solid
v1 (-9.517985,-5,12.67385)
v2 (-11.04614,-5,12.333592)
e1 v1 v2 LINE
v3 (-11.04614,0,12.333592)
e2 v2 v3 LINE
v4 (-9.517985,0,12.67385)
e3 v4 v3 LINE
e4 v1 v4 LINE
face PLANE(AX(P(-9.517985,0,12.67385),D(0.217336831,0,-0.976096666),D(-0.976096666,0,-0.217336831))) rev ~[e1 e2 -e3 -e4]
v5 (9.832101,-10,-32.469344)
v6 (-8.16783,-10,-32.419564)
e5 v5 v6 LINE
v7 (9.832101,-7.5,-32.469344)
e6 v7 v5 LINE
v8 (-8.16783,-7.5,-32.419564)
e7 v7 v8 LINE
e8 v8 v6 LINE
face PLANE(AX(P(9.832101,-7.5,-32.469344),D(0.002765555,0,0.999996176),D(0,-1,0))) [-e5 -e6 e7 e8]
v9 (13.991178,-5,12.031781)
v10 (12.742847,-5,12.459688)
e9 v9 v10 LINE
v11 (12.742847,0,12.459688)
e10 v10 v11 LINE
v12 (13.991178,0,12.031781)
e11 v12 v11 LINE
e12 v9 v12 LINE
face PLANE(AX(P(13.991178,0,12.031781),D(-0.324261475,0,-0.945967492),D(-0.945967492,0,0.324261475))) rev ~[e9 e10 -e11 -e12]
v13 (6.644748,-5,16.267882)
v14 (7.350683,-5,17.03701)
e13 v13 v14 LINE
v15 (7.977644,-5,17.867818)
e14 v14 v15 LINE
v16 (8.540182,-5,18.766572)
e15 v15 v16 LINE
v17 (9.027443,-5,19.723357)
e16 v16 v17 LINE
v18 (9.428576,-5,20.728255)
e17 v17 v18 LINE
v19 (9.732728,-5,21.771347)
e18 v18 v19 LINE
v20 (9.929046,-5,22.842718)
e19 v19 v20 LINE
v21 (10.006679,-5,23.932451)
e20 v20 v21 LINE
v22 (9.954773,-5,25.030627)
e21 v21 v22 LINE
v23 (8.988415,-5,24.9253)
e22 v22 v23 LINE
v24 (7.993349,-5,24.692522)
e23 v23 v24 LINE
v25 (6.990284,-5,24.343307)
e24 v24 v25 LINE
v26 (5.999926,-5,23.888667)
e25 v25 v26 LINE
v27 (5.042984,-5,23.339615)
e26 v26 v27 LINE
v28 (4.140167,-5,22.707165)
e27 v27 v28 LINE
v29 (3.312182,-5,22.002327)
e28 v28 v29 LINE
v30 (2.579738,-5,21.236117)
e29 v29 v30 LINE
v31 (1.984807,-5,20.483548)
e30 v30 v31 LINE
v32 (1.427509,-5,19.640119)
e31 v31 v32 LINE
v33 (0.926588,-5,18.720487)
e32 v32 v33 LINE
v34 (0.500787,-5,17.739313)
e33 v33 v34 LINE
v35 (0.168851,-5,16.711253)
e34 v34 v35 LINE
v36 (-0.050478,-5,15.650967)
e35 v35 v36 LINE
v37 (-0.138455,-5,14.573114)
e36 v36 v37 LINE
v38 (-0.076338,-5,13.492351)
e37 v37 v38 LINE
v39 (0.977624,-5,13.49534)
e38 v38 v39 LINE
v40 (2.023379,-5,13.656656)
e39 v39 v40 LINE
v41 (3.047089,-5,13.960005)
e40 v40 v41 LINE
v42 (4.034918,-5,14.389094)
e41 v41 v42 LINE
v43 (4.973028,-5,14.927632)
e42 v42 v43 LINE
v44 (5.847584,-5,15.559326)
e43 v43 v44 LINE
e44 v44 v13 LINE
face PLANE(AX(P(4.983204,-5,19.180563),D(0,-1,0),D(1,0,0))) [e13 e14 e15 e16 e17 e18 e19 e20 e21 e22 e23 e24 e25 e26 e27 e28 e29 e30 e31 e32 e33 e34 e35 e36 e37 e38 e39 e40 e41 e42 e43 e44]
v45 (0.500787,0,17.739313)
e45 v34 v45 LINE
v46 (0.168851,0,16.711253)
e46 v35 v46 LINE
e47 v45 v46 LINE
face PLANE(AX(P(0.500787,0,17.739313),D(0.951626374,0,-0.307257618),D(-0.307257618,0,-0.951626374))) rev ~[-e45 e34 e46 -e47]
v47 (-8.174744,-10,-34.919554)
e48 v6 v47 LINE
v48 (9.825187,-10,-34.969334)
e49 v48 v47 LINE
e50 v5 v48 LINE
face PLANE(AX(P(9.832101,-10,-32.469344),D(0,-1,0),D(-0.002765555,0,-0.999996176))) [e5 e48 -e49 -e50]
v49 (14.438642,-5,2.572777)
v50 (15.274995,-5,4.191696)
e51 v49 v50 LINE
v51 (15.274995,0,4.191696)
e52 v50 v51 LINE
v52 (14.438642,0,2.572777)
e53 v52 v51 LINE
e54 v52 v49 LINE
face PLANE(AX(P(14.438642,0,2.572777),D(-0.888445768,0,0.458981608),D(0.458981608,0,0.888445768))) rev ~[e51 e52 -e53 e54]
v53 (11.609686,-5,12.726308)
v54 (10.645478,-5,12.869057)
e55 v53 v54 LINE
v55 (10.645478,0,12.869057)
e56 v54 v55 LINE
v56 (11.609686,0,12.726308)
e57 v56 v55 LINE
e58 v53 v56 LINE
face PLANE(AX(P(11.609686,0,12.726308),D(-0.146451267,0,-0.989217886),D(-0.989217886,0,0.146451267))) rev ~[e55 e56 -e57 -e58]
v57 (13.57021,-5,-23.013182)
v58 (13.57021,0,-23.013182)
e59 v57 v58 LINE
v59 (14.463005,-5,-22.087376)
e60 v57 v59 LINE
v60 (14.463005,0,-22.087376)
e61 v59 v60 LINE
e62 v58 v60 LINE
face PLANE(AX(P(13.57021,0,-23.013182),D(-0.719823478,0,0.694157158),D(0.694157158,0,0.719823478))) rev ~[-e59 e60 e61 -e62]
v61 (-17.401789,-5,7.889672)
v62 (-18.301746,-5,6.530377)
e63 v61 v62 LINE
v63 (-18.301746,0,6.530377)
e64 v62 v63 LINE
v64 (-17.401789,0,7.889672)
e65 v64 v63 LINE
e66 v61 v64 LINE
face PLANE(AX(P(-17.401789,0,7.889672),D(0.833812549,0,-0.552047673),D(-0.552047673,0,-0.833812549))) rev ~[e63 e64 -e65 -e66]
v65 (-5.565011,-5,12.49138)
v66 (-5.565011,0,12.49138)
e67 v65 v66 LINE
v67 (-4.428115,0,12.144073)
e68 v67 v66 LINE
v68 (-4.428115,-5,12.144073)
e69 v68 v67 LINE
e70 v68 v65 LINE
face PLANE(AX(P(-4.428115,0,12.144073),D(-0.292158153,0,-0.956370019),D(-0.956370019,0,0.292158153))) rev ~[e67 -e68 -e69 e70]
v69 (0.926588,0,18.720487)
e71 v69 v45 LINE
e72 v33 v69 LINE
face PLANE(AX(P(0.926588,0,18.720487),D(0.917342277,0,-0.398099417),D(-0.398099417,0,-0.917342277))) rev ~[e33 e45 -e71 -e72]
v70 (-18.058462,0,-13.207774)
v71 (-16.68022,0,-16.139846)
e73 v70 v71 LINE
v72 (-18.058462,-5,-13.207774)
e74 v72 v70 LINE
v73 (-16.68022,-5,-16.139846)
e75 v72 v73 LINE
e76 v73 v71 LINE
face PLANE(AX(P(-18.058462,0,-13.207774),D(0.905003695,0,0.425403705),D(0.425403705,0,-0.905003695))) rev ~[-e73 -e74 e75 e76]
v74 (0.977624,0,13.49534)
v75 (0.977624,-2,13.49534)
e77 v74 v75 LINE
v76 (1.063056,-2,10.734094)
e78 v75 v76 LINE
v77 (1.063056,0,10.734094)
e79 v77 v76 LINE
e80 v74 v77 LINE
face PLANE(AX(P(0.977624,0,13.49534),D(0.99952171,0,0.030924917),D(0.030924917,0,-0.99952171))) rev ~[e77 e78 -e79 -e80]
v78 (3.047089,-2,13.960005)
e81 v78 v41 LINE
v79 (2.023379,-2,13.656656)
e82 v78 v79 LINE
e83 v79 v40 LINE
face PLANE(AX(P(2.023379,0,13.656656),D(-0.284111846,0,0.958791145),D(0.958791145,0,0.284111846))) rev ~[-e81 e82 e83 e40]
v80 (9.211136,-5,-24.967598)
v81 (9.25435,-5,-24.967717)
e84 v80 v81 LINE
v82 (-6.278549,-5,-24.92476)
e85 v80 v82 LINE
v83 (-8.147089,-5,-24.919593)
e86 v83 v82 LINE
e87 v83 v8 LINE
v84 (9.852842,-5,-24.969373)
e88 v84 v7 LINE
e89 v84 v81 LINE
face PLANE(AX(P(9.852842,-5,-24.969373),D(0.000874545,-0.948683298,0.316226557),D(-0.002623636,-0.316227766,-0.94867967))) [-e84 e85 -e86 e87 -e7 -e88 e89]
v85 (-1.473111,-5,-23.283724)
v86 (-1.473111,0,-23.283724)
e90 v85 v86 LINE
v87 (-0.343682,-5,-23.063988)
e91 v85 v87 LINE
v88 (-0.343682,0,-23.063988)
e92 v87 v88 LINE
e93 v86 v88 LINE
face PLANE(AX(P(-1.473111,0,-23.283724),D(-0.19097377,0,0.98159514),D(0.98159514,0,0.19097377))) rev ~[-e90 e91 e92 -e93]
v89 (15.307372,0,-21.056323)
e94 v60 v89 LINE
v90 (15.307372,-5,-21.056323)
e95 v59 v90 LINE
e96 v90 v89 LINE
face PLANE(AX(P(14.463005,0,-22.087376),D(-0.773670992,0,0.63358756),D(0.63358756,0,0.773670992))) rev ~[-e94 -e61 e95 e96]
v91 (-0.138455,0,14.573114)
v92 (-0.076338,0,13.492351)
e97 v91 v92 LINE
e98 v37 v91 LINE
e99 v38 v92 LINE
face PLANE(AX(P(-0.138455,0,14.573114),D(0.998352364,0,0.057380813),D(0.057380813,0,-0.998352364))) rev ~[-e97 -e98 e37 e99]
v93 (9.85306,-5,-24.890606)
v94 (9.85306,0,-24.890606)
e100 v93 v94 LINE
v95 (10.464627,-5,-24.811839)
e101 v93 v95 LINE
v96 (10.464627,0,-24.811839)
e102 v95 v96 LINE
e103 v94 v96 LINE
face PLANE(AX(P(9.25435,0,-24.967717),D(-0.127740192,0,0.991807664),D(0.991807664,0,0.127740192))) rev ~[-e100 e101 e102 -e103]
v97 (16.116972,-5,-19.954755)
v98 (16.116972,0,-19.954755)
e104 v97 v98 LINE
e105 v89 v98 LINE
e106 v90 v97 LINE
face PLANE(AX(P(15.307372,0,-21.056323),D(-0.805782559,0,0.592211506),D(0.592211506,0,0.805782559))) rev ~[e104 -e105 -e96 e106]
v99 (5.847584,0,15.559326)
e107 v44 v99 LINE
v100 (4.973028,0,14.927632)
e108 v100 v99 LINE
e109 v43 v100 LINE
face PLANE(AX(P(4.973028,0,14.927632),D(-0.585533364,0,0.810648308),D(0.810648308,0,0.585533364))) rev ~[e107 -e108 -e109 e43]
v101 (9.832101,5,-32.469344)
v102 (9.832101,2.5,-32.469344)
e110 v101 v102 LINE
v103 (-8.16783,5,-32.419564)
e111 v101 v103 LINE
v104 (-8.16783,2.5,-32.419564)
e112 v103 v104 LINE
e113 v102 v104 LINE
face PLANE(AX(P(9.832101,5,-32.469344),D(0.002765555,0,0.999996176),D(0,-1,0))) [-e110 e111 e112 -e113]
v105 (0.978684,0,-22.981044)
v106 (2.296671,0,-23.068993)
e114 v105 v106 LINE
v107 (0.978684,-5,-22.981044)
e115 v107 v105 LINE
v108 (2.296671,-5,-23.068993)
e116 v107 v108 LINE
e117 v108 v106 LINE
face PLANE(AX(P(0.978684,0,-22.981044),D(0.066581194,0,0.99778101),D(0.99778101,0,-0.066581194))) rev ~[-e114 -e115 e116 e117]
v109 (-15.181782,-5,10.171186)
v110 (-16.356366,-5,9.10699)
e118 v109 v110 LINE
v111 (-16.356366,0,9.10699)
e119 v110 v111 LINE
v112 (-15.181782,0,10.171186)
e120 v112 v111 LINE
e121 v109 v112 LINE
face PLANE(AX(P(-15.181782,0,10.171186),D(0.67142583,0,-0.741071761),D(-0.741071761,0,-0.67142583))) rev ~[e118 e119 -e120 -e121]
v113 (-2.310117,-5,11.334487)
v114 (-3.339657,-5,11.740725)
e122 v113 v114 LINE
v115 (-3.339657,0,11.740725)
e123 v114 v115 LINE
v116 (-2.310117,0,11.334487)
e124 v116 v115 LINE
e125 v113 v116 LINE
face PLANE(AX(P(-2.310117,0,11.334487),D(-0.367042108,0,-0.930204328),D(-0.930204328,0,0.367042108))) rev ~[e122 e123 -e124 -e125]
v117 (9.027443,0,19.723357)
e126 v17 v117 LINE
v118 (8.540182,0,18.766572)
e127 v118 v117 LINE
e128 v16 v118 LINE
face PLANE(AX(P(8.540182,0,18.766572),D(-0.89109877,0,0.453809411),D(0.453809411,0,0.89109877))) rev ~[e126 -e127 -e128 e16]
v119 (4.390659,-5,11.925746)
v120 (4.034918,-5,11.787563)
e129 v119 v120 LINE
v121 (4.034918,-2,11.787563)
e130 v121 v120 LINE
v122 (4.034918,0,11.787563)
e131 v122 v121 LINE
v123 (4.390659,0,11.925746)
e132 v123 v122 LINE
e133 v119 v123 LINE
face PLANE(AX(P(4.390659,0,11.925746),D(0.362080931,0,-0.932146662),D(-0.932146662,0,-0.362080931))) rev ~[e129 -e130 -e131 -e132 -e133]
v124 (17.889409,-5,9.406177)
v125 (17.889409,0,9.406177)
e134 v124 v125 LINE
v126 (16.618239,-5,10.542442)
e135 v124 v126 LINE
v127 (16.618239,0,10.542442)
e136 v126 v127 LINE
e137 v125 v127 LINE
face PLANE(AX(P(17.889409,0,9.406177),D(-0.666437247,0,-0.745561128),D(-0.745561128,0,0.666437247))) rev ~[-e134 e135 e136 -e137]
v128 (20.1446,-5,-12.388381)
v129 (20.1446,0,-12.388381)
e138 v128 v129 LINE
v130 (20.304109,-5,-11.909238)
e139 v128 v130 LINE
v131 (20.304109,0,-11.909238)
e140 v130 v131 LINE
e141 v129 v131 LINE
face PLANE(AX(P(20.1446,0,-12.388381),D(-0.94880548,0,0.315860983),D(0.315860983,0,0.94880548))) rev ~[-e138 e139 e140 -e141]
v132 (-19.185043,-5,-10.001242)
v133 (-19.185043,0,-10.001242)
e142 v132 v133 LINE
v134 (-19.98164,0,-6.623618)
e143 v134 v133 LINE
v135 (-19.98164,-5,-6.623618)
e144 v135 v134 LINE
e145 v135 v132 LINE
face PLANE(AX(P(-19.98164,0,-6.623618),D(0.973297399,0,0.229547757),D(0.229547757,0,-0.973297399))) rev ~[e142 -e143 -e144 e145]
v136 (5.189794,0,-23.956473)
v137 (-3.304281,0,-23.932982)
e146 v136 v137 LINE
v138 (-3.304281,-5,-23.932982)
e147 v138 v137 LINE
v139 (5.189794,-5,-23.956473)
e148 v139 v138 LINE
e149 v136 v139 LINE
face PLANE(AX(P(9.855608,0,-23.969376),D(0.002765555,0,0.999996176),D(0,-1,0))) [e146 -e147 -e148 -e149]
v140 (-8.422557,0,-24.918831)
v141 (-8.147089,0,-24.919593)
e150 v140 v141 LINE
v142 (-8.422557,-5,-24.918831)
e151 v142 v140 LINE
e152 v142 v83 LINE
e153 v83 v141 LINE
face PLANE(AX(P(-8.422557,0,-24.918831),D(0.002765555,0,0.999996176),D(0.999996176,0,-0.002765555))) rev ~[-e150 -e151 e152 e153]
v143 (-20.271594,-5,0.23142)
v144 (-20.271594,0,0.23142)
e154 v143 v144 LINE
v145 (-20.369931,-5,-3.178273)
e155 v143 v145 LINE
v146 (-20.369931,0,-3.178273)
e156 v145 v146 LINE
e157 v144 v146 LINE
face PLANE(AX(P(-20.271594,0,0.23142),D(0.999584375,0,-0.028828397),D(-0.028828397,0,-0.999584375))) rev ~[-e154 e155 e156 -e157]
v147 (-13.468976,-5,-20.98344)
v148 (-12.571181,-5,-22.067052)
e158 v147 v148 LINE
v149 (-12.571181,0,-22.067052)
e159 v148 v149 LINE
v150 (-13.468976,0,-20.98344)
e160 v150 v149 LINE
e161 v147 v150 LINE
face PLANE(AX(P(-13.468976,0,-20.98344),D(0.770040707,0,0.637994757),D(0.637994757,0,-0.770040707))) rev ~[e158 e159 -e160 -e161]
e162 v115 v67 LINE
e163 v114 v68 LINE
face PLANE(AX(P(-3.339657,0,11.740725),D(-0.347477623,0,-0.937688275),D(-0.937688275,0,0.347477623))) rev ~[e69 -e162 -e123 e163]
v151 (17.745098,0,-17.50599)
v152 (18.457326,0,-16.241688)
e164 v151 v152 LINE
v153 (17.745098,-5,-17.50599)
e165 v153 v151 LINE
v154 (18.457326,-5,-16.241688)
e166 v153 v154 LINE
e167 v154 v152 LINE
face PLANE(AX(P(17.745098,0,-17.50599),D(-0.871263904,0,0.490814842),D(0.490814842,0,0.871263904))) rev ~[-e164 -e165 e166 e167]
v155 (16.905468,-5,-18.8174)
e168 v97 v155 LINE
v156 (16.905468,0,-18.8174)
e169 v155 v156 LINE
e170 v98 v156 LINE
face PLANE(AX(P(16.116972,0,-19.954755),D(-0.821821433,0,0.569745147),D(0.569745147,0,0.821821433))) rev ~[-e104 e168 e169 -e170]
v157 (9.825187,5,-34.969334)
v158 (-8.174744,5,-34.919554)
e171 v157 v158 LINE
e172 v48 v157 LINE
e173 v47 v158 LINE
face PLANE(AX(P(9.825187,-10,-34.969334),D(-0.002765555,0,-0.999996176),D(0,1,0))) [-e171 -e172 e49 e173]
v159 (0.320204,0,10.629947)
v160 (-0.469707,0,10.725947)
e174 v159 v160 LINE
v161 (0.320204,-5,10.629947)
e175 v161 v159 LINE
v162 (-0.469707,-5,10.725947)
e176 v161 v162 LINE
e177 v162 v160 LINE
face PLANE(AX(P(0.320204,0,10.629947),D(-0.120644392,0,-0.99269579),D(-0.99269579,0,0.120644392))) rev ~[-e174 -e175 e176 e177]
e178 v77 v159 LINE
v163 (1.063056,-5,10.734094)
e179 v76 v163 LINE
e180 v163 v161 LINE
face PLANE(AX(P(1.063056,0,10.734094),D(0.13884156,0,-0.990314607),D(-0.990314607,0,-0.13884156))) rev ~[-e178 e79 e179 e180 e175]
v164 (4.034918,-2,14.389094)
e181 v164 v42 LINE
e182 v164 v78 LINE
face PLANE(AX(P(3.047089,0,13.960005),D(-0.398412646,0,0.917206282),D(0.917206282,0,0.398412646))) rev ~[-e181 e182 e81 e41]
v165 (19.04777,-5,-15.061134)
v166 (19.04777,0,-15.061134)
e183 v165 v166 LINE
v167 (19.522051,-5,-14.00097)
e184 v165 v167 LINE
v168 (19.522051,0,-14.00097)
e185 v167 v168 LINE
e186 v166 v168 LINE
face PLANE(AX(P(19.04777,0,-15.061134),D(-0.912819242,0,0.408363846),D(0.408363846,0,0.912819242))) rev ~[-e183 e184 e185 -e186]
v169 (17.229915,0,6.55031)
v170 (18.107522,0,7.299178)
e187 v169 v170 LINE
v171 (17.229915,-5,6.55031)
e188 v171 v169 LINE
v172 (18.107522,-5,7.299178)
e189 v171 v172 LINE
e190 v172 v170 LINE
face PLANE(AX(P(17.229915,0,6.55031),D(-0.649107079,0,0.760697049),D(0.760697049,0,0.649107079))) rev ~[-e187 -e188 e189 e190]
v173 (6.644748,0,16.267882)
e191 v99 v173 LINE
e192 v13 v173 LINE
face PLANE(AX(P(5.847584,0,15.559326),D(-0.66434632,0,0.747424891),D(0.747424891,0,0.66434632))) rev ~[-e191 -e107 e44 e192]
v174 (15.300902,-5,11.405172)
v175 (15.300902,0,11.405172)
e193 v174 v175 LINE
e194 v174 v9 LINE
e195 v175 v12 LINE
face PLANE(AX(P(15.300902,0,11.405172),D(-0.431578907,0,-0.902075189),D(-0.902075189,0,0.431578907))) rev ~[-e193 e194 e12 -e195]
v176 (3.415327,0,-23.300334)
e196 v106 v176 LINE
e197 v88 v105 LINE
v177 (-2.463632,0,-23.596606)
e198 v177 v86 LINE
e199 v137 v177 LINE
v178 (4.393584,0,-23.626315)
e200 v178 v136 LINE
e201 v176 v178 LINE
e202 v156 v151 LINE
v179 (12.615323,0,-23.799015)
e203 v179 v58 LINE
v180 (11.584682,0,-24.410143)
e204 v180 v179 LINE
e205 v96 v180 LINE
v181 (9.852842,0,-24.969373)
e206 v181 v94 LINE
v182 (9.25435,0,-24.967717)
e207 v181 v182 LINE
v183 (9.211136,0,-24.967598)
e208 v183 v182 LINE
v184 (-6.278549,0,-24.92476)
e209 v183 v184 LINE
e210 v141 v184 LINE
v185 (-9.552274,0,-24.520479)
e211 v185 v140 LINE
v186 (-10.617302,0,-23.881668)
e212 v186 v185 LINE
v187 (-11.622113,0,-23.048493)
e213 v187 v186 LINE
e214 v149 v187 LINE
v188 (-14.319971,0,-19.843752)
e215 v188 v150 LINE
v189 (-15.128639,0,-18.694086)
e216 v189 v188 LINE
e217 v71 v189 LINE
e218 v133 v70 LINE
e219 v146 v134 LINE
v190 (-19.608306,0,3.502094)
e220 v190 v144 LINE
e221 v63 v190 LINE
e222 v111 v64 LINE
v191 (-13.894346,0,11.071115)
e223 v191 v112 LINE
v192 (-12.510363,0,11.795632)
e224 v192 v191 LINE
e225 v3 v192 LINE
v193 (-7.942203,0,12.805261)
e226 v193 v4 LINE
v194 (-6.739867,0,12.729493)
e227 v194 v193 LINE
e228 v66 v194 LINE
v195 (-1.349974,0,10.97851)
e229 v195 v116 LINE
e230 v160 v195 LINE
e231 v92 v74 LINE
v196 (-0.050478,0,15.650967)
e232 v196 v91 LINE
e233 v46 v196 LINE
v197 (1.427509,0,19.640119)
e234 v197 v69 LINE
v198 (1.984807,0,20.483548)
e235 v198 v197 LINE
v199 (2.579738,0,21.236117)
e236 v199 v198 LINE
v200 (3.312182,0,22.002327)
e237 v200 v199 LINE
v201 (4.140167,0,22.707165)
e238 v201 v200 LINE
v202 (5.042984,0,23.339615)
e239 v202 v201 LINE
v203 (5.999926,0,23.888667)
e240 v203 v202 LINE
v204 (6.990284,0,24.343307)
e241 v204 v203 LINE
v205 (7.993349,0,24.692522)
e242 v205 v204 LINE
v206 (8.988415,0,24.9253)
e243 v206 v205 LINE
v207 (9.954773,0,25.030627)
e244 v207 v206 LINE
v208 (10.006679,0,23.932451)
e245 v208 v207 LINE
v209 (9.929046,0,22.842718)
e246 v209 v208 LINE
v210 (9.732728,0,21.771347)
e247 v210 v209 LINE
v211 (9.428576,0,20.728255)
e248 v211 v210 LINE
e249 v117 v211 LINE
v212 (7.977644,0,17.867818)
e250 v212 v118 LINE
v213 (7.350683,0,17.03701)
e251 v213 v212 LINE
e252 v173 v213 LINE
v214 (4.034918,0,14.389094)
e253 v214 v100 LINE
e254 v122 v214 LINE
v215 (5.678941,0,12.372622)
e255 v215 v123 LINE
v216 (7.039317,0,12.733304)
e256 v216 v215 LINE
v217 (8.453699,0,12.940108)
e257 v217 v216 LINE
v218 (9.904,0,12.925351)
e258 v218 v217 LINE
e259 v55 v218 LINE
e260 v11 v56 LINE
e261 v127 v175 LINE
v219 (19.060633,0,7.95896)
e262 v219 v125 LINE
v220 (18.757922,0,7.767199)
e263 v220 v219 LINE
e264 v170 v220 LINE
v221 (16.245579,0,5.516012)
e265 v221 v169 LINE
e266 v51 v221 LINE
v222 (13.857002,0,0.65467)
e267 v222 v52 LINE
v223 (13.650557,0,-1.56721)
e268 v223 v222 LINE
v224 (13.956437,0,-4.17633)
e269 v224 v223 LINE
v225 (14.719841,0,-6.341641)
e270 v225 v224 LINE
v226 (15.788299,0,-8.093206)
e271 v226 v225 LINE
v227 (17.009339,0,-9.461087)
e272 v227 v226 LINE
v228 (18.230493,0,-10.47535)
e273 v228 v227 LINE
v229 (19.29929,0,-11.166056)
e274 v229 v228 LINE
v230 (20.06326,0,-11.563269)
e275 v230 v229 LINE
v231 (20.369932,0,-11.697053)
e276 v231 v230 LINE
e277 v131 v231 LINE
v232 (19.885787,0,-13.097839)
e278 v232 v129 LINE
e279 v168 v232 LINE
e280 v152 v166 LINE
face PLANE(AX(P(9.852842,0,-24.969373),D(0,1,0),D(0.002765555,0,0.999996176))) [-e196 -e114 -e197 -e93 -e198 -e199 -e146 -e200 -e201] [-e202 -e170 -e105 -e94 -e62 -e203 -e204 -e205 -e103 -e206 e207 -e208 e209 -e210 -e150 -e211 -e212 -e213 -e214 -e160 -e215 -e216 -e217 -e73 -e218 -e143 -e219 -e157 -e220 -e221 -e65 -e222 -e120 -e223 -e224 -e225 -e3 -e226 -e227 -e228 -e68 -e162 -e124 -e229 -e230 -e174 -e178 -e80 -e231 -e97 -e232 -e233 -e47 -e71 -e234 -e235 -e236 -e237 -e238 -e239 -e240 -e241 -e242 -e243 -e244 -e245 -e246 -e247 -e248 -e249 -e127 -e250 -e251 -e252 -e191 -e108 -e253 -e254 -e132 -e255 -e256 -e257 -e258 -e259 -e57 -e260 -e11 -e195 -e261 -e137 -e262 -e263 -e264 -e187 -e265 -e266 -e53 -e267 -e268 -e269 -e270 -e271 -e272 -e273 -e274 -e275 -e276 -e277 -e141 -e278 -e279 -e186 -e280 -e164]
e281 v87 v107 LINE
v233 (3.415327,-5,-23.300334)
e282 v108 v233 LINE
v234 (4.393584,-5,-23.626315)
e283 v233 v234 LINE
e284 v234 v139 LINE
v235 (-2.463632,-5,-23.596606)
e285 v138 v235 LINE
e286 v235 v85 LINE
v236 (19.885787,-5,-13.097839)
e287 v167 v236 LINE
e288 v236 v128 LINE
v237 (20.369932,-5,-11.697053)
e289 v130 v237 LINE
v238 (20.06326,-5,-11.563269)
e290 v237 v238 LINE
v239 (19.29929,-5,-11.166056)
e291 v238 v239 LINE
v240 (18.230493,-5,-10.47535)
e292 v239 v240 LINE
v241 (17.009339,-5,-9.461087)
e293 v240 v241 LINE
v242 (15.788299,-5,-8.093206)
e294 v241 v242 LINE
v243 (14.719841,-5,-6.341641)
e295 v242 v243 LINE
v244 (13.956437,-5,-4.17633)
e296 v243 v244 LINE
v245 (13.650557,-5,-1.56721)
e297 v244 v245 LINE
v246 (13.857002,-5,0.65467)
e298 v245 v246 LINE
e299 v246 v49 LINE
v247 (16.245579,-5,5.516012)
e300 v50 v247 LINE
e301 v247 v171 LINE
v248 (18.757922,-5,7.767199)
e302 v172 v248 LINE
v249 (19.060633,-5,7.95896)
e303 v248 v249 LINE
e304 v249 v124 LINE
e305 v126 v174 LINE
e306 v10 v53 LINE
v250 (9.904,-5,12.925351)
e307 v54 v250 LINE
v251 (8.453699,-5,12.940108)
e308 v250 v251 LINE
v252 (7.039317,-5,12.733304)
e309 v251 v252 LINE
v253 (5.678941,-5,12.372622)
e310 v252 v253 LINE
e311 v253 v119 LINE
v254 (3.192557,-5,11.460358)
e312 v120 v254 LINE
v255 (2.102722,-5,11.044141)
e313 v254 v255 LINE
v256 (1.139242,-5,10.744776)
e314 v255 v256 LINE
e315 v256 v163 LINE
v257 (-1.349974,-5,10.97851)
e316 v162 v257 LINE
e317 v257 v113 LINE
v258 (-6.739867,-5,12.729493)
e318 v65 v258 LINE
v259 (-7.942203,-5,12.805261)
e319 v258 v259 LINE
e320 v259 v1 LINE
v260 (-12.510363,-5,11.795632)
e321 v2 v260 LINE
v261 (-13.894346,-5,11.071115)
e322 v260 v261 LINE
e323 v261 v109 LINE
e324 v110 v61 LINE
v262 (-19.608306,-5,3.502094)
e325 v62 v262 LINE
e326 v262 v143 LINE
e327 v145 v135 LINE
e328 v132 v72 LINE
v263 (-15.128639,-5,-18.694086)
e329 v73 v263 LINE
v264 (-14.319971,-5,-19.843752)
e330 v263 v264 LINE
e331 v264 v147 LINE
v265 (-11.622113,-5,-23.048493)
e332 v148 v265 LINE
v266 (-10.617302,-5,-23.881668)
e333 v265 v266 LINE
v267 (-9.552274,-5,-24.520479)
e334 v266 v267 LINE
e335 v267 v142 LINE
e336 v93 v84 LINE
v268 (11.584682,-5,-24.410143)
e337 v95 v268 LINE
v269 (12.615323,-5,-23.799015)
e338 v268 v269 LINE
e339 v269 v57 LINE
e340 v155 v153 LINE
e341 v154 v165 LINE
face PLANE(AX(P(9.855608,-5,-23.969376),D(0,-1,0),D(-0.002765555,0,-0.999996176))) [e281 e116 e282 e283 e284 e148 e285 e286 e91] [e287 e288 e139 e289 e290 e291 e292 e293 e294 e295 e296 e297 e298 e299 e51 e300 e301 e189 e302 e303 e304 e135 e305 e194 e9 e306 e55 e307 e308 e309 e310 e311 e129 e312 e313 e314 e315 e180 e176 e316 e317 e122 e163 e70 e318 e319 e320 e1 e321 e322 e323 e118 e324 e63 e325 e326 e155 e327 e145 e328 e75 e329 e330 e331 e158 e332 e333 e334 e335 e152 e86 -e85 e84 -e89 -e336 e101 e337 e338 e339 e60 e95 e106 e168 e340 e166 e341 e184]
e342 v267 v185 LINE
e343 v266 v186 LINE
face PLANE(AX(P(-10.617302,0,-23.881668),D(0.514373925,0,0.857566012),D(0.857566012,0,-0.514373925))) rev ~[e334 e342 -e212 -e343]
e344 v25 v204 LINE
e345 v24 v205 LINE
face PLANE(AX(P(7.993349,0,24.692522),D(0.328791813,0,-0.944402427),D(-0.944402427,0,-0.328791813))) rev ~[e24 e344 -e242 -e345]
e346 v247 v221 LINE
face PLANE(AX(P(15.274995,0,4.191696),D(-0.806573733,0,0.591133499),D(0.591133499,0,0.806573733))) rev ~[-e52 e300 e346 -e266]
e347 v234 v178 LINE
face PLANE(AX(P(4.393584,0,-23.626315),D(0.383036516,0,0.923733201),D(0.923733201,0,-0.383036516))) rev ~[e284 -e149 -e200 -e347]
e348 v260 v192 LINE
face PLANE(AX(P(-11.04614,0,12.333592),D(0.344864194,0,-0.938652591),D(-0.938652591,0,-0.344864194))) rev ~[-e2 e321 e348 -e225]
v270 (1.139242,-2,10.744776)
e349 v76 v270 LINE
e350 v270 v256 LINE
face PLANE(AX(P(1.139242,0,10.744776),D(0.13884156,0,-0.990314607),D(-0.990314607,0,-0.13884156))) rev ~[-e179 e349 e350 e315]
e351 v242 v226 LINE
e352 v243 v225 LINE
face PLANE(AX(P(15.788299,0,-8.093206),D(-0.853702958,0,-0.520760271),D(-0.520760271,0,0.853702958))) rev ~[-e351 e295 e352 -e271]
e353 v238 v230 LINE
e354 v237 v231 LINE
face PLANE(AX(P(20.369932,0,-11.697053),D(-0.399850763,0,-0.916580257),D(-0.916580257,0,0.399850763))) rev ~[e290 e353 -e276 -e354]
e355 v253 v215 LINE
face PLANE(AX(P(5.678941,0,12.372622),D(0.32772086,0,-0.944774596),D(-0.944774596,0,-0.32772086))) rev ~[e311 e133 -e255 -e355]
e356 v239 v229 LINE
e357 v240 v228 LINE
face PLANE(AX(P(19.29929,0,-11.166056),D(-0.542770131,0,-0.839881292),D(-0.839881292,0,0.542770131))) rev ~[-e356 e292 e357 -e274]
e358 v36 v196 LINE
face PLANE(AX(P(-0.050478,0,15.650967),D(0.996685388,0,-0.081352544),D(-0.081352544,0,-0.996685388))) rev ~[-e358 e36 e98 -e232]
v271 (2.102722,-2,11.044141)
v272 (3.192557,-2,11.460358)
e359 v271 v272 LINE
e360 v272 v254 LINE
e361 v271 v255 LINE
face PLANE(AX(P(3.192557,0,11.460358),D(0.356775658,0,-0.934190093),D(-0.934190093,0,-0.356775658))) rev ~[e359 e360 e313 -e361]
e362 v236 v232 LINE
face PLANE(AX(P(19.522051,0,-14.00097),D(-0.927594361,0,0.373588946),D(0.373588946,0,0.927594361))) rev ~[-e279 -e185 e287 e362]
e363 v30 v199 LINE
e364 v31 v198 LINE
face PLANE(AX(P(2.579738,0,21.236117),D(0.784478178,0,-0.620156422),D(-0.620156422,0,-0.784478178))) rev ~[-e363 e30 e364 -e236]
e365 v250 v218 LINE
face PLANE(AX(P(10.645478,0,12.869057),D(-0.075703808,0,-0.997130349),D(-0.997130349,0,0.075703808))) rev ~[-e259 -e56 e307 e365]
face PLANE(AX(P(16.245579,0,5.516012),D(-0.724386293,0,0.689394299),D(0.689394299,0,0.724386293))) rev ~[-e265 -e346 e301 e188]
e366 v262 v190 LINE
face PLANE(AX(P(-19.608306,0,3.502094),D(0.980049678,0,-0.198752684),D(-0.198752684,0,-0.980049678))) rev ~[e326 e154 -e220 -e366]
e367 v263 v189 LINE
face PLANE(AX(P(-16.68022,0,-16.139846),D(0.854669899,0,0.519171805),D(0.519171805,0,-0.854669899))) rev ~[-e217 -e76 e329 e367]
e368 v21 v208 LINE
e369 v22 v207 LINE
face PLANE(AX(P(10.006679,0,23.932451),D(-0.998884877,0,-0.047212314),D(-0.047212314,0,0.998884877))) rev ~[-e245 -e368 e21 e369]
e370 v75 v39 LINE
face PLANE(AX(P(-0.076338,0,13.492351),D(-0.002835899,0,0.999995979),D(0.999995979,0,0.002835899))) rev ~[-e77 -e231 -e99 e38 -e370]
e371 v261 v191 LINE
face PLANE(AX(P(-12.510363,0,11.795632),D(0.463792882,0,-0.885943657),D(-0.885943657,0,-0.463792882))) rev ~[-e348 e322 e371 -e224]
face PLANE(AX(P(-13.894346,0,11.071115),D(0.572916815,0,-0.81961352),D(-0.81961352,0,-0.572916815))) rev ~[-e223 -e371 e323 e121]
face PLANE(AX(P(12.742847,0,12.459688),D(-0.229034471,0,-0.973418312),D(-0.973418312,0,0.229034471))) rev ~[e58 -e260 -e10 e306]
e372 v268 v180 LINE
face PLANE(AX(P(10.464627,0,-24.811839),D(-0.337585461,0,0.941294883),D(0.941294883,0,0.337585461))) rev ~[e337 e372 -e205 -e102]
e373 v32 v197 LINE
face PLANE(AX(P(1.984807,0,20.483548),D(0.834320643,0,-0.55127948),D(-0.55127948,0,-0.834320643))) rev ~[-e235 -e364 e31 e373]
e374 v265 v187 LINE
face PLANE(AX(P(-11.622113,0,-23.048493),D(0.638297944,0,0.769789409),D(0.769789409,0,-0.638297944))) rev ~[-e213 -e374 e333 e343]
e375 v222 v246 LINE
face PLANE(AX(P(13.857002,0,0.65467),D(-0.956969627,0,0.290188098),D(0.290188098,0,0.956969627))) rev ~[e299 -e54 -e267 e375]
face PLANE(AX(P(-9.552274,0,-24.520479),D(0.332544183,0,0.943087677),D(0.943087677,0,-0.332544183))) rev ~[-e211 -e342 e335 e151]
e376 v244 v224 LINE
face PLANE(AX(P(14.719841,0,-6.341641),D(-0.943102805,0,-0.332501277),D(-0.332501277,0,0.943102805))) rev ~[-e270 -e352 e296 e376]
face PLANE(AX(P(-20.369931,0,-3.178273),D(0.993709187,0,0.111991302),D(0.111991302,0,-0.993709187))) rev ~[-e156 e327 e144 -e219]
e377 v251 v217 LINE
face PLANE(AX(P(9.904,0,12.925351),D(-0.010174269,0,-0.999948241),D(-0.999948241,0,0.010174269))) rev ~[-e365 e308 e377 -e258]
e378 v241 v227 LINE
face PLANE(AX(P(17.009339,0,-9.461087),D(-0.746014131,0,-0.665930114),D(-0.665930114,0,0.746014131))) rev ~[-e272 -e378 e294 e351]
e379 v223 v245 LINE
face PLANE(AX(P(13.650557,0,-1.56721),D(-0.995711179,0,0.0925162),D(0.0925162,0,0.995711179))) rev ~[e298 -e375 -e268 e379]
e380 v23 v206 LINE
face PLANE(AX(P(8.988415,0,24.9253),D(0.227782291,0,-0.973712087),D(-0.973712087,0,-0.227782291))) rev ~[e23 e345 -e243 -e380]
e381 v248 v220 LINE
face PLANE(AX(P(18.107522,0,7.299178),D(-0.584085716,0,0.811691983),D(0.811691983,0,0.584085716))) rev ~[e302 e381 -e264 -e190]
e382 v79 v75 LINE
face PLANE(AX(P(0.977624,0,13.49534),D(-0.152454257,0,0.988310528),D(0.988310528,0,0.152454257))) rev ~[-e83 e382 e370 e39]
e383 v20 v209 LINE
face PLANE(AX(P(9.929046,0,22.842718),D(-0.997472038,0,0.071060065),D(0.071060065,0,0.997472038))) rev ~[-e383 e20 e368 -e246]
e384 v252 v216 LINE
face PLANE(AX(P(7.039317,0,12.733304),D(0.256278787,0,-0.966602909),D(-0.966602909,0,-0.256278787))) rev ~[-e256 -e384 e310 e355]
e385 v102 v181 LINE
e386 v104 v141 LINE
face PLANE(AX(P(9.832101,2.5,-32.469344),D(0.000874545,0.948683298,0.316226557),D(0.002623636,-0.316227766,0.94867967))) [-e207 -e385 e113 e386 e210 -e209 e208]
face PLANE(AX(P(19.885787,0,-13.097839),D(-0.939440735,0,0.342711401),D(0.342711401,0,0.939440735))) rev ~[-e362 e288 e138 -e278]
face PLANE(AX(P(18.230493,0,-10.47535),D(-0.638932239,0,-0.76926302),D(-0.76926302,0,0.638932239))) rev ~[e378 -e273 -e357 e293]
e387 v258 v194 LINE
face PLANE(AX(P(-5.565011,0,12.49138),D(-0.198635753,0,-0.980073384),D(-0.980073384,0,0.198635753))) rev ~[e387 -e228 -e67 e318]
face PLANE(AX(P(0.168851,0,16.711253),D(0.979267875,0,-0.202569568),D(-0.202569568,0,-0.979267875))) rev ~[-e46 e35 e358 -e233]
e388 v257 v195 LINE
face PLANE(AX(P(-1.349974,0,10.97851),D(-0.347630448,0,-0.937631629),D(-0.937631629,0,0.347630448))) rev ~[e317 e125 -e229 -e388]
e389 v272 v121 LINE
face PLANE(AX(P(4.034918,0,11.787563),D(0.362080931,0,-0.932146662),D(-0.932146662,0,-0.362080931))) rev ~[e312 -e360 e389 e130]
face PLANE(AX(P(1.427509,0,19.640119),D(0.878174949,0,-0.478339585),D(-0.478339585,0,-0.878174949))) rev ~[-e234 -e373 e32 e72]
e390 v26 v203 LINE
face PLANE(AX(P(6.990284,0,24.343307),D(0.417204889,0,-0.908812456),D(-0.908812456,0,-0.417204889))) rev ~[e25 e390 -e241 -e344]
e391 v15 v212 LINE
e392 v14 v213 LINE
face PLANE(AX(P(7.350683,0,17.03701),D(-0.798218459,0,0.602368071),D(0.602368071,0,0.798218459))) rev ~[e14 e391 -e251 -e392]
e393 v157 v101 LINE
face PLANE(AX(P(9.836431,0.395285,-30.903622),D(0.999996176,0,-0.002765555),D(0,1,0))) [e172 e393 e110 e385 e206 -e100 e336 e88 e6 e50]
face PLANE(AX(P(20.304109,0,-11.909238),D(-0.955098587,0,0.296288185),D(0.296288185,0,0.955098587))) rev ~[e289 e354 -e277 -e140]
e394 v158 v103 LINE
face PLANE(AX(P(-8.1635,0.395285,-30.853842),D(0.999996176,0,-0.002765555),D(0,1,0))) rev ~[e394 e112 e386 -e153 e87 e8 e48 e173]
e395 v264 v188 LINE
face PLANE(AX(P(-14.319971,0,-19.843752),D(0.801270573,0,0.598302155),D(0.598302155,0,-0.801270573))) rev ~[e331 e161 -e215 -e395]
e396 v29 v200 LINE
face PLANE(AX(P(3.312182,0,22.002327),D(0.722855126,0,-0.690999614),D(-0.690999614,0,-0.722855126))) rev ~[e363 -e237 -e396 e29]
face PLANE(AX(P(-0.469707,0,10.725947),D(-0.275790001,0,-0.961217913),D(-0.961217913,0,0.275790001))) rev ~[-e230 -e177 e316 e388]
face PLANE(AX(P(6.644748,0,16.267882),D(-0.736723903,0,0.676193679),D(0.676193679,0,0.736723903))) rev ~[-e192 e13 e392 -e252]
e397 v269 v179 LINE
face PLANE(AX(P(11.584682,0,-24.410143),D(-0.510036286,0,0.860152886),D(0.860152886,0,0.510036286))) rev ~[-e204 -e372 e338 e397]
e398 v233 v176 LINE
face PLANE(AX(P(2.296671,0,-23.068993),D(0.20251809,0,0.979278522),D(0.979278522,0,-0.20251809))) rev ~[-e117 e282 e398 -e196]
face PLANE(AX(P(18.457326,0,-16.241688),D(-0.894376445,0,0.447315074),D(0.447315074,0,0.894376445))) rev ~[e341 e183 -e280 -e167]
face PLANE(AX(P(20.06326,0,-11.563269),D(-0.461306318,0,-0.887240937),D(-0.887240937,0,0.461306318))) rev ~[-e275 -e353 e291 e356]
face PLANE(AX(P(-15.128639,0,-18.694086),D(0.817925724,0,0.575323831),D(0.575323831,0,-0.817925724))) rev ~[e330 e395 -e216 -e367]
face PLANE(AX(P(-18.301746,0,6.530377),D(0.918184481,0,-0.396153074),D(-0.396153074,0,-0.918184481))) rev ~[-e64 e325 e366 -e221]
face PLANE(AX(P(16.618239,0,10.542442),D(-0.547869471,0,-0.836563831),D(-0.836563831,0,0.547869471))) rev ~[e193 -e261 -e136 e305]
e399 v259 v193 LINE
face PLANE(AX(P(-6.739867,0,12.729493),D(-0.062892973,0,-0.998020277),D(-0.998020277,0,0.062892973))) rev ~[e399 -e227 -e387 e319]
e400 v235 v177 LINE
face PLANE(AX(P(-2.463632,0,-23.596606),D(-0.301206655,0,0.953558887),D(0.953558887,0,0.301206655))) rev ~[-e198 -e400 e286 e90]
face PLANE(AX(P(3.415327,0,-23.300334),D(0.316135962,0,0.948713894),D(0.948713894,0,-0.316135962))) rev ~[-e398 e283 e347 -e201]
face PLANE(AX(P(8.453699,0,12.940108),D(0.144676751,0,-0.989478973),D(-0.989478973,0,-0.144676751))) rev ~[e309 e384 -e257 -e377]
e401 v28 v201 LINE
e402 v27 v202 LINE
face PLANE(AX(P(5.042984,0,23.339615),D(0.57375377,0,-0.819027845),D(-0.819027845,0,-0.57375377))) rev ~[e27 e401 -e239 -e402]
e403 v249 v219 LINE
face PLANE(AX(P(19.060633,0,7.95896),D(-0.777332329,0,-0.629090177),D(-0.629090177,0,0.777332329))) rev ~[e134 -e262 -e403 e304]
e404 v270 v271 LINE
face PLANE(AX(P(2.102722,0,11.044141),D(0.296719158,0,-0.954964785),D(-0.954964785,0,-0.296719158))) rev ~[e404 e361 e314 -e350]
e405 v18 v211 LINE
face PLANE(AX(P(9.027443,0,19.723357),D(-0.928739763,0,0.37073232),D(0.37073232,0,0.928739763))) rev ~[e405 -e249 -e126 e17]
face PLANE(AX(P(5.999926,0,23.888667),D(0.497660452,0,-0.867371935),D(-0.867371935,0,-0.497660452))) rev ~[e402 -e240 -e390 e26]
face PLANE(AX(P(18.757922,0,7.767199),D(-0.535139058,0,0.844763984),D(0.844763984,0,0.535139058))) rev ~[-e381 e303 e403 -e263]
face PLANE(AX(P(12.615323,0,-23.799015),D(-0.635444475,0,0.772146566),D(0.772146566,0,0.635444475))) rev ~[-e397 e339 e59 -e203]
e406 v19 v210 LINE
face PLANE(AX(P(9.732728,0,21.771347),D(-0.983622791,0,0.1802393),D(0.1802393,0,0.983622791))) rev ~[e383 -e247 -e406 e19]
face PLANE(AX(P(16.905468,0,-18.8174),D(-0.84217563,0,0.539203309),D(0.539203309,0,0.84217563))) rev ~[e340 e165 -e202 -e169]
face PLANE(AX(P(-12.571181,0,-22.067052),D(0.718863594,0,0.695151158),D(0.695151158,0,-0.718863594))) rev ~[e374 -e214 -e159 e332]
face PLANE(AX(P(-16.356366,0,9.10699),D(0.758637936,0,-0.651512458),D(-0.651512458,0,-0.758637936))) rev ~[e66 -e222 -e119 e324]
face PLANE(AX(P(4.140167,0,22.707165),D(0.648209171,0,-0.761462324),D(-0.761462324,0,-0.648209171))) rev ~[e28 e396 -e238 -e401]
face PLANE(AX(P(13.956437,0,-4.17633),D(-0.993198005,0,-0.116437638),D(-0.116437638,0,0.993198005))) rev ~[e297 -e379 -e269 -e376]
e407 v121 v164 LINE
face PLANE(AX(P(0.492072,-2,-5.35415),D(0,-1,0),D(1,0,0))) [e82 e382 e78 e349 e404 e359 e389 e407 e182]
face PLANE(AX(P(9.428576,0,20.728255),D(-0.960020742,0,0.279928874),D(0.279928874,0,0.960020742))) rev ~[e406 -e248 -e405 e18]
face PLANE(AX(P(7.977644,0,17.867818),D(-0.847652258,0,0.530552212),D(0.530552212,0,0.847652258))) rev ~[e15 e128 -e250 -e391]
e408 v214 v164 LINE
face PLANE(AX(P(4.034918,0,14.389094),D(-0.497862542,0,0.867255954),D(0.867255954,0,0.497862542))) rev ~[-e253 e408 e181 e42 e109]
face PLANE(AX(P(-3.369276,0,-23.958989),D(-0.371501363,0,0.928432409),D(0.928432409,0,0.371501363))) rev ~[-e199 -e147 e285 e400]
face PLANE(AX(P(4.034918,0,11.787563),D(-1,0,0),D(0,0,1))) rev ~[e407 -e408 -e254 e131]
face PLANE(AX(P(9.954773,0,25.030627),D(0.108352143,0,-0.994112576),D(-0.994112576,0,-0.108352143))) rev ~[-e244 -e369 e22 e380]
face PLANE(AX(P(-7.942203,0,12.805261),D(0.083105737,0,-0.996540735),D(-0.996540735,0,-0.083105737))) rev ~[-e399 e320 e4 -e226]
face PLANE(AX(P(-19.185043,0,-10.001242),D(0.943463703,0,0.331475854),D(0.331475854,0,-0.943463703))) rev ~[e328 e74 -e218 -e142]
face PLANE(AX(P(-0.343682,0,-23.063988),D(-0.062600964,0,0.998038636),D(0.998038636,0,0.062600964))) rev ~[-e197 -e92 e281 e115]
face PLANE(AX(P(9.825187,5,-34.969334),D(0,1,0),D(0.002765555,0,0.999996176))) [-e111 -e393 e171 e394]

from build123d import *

# Parameters (mm, degrees)
F1_DEPTH = 2
F2_DEPTH = 5
F5_DEPTH = 18


# Not quite as in the source:
# - ends of sketch curves that miss each other by under 0.0002 mm in the source are joined


with BuildPart() as f1:
    # F0 (on Front) → F1 (new body)
    with BuildSketch(Plane.XZ):
        Polygon((13.9564371829, -4.1763302545), (13.6505568212, -1.5672102939), (13.8570021684, 0.6546701968), (14.4386421574, 2.572777133), (15.2749946567, 4.1916956816), (16.2455787436, 5.5160118155), (17.2299147044, 6.5503102987), (18.1075224224, 7.29917791), (18.7579217808, 7.7671990103), (19.0606326631, 7.9589595725), (17.8894090385, 9.4061765559), (16.6182390109, 10.5424416074), (15.3009021796, 11.4051715106), (13.991178144, 12.0317814369), (12.7428465032, 12.45968817), (11.6096864535, 12.7263080903), (10.6454779973, 12.8690567726), (9.9040003307, 12.9253510002), (8.4536993007, 12.9401075165), (7.0393171578, 12.7333035124), (5.6789414949, 12.3726223866), (4.3906586959, 11.9257463288), (4.0349177671, 11.7875631309), (3.1925567568, 11.4603583345), (2.1027220613, 11.0441405935), (1.1392422025, 10.7447756984), (1.0630562956, 10.7340944764), (0.3202043703, 10.6299470477), (-0.4697068924, 10.7259466125), (-1.3499739104, 10.9785104051), (-2.3101170508, 11.3344870803), (-3.3396570834, 11.740725293), (-4.428114778, 12.144073295), (-5.5650109045, 12.4913797411), (-6.7398666357, 12.7294928833), (-7.9422027416, 12.8052613763), (-9.5179845331, 12.6738502829), (-11.0461403111, 12.3335924529), (-12.5103628719, 11.7956320422), (-13.8943458175, 11.0711148186), (-15.1817823473, 10.171185744), (-16.3563656605, 9.1069897803), (-17.4017889563, 7.8896718894), (-18.3017458369, 6.530377436), (-19.6083064378, 3.5020943147), (-20.2715944756, 0.231420362), (-20.3699313552, -3.1782734497), (-19.9816400935, -6.6236177604), (-19.1850429015, -10.0012415978), (-18.0584619901, -13.2077743927), (-16.6802199733, -16.139845979), (-15.1286390619, -18.6940861905), (-14.3199712507, -19.8437521157), (-13.468975877, -20.9834397215), (-12.5711806097, -22.0670519206), (-11.6221131177, -23.0484932379), (-10.617301876, -23.881667795), (-9.5522737476, -24.5204789077), (-8.4225572075, -24.9188306978), (-6.2785486616, -24.924760094), (-6.1172446521, -24.9066919741), (-5.1420524281, -24.6576772732), (-4.2440729965, -24.3272277028), (-3.3692761011, -23.9589889904), (-2.4636318887, -23.5966060577), (-1.4731105063, -23.2837238261), (-0.3436821007, -23.0639884263), (0.9786835843, -22.9810443767), (2.2966708338, -23.0689926979), (3.415326636, -23.3003344778), (4.3935835633, -23.6263149411), (5.2903729793, -23.9981789094), (6.1646270535, -24.3671716073), (7.0752771494, -24.6845382594), (8.0812554366, -24.9015236875), (9.211135995, -24.9675978327), (9.2543495324, -24.9677173425), (10.4646266505, -24.8118393056), (11.5846824237, -24.4101431404), (12.6153226062, -23.7990147009), (13.5702096091, -23.0131824556), (14.4630054406, -22.087375679), (15.3073721089, -21.0563232426), (16.1169720251, -19.9547548237), (16.9054676003, -18.817399697), (17.7450979821, -17.5059903767), (18.4573257656, -16.2416880249), (19.0477701778, -15.0611340813), (19.522050849, -14.0009703886), (19.8857874094, -13.0978387898), (20.1446002953, -12.3883807244), (20.3041087338, -11.9092380354), (20.3699323552, -11.6970525654), (20.0632597243, -11.5632690975), (19.2992902384, -11.1660557409), (18.2304933913, -10.4753497913), (17.0093394832, -9.461087335), (15.7882988139, -8.0932056676), (14.7198412805, -6.3416408756), align=None)
        Polygon((3.1925567568, 11.4603583345), (4.0349177671, 11.7875631309), (4.0349177671, 14.3890940084), (3.0470887296, 13.9600045134), (2.0233786856, 13.6566557055), (0.9776241359, 13.4953402808), (1.0630562956, 10.7340944764), (1.1392422025, 10.7447756984), (2.1027220613, 11.0441405935), align=None)
        Polygon((3.0470887296, 13.9600045134), (4.0349177671, 14.3890940084), (4.9730284914, 14.9276318971), (5.8475844015, 15.5593258862), (6.6447481909, 16.2678824734), (7.3506829556, 17.0370097684), (7.9776442852, 17.8678175927), (8.5401819643, 18.7665723681), (9.0274431955, 19.7233570289), (9.4285759872, 20.7282545094), (9.7327275419, 21.7713473411), (9.9290458681, 22.8427184583), (10.0066785712, 23.9324507955), (9.9547732566, 25.030626884), (8.9884152767, 24.9252998211), (7.9933494289, 24.6925222045), (6.9902835166, 24.3433068169), (5.9999257462, 23.888667247), (5.0429839212, 23.3396154714), (4.1401666508, 22.7071646759), (3.3121821416, 22.0023272402), (2.5797377939, 21.2361167529), (1.9848069462, 20.4835481245), (1.4275088821, 19.6401188001), (0.9265880606, 18.7204873704), (0.5007873288, 17.7393128294), (0.1688511456, 16.7112529619), (-0.0504776421, 15.6509671648), (-0.1384553812, 14.5731136257), (-0.0763380157, 13.4923513387), (0.9776241359, 13.4953402808), (2.0233786856, 13.6566557055), align=None)
    extrude(amount=F1_DEPTH)

    # F0 (on Front) → F2 (join)
    with BuildSketch(Plane.XZ):
        Polygon((13.9564371829, -4.1763302545), (13.6505568212, -1.5672102939), (13.8570021684, 0.6546701968), (14.4386421574, 2.572777133), (15.2749946567, 4.1916956816), (16.2455787436, 5.5160118155), (17.2299147044, 6.5503102987), (18.1075224224, 7.29917791), (18.7579217808, 7.7671990103), (19.0606326631, 7.9589595725), (17.8894090385, 9.4061765559), (16.6182390109, 10.5424416074), (15.3009021796, 11.4051715106), (13.991178144, 12.0317814369), (12.7428465032, 12.45968817), (11.6096864535, 12.7263080903), (10.6454779973, 12.8690567726), (9.9040003307, 12.9253510002), (8.4536993007, 12.9401075165), (7.0393171578, 12.7333035124), (5.6789414949, 12.3726223866), (4.3906586959, 11.9257463288), (4.0349177671, 11.7875631309), (3.1925567568, 11.4603583345), (2.1027220613, 11.0441405935), (1.1392422025, 10.7447756984), (1.0630562956, 10.7340944764), (0.3202043703, 10.6299470477), (-0.4697068924, 10.7259466125), (-1.3499739104, 10.9785104051), (-2.3101170508, 11.3344870803), (-3.3396570834, 11.740725293), (-4.428114778, 12.144073295), (-5.5650109045, 12.4913797411), (-6.7398666357, 12.7294928833), (-7.9422027416, 12.8052613763), (-9.5179845331, 12.6738502829), (-11.0461403111, 12.3335924529), (-12.5103628719, 11.7956320422), (-13.8943458175, 11.0711148186), (-15.1817823473, 10.171185744), (-16.3563656605, 9.1069897803), (-17.4017889563, 7.8896718894), (-18.3017458369, 6.530377436), (-19.6083064378, 3.5020943147), (-20.2715944756, 0.231420362), (-20.3699313552, -3.1782734497), (-19.9816400935, -6.6236177604), (-19.1850429015, -10.0012415978), (-18.0584619901, -13.2077743927), (-16.6802199733, -16.139845979), (-15.1286390619, -18.6940861905), (-14.3199712507, -19.8437521157), (-13.468975877, -20.9834397215), (-12.5711806097, -22.0670519206), (-11.6221131177, -23.0484932379), (-10.617301876, -23.881667795), (-9.5522737476, -24.5204789077), (-8.4225572075, -24.9188306978), (-6.2785486616, -24.924760094), (-6.1172446521, -24.9066919741), (-5.1420524281, -24.6576772732), (-4.2440729965, -24.3272277028), (-3.3692761011, -23.9589889904), (-2.4636318887, -23.5966060577), (-1.4731105063, -23.2837238261), (-0.3436821007, -23.0639884263), (0.9786835843, -22.9810443767), (2.2966708338, -23.0689926979), (3.415326636, -23.3003344778), (4.3935835633, -23.6263149411), (5.2903729793, -23.9981789094), (6.1646270535, -24.3671716073), (7.0752771494, -24.6845382594), (8.0812554366, -24.9015236875), (9.211135995, -24.9675978327), (9.2543495324, -24.9677173425), (10.4646266505, -24.8118393056), (11.5846824237, -24.4101431404), (12.6153226062, -23.7990147009), (13.5702096091, -23.0131824556), (14.4630054406, -22.087375679), (15.3073721089, -21.0563232426), (16.1169720251, -19.9547548237), (16.9054676003, -18.817399697), (17.7450979821, -17.5059903767), (18.4573257656, -16.2416880249), (19.0477701778, -15.0611340813), (19.522050849, -14.0009703886), (19.8857874094, -13.0978387898), (20.1446002953, -12.3883807244), (20.3041087338, -11.9092380354), (20.3699323552, -11.6970525654), (20.0632597243, -11.5632690975), (19.2992902384, -11.1660557409), (18.2304933913, -10.4753497913), (17.0093394832, -9.461087335), (15.7882988139, -8.0932056676), (14.7198412805, -6.3416408756), align=None)
        Polygon((3.0470887296, 13.9600045134), (4.0349177671, 14.3890940084), (4.9730284914, 14.9276318971), (5.8475844015, 15.5593258862), (6.6447481909, 16.2678824734), (7.3506829556, 17.0370097684), (7.9776442852, 17.8678175927), (8.5401819643, 18.7665723681), (9.0274431955, 19.7233570289), (9.4285759872, 20.7282545094), (9.7327275419, 21.7713473411), (9.9290458681, 22.8427184583), (10.0066785712, 23.9324507955), (9.9547732566, 25.030626884), (8.9884152767, 24.9252998211), (7.9933494289, 24.6925222045), (6.9902835166, 24.3433068169), (5.9999257462, 23.888667247), (5.0429839212, 23.3396154714), (4.1401666508, 22.7071646759), (3.3121821416, 22.0023272402), (2.5797377939, 21.2361167529), (1.9848069462, 20.4835481245), (1.4275088821, 19.6401188001), (0.9265880606, 18.7204873704), (0.5007873288, 17.7393128294), (0.1688511456, 16.7112529619), (-0.0504776421, 15.6509671648), (-0.1384553812, 14.5731136257), (-0.0763380157, 13.4923513387), (0.9776241359, 13.4953402808), (2.0233786856, 13.6566557055), align=None)
    extrude(amount=F2_DEPTH)

    # F4 (on line) → F5 (join)
    with BuildSketch(Plane(origin=(9.921820884, 0, -0.0274394463), x_dir=(0, 1, 0), z_dir=(0.9999961758, 0, -0.002765555))):
        Polygon((0, -24.9420284495), (-2.5, -24.9420284495), (-2.5, -34.9420284495), (5, -34.9420284495), (5, -32.4420284495), (2.5, -32.4420284495), align=None)
        Polygon((-2.5, -24.9420284495), (-5, -24.9420284495), (-7.5, -32.4420284495), (-10, -32.4420284495), (-10, -34.9420284495), (-2.5, -34.9420284495), align=None)
        Polygon((-5, -23.9420284495), (-5, -24.9420284495), (-2.5, -24.9420284495), (0, -24.9420284495), (0, -23.9420284495), align=None)
    extrude(amount=-F5_DEPTH)


solid = f1.part
